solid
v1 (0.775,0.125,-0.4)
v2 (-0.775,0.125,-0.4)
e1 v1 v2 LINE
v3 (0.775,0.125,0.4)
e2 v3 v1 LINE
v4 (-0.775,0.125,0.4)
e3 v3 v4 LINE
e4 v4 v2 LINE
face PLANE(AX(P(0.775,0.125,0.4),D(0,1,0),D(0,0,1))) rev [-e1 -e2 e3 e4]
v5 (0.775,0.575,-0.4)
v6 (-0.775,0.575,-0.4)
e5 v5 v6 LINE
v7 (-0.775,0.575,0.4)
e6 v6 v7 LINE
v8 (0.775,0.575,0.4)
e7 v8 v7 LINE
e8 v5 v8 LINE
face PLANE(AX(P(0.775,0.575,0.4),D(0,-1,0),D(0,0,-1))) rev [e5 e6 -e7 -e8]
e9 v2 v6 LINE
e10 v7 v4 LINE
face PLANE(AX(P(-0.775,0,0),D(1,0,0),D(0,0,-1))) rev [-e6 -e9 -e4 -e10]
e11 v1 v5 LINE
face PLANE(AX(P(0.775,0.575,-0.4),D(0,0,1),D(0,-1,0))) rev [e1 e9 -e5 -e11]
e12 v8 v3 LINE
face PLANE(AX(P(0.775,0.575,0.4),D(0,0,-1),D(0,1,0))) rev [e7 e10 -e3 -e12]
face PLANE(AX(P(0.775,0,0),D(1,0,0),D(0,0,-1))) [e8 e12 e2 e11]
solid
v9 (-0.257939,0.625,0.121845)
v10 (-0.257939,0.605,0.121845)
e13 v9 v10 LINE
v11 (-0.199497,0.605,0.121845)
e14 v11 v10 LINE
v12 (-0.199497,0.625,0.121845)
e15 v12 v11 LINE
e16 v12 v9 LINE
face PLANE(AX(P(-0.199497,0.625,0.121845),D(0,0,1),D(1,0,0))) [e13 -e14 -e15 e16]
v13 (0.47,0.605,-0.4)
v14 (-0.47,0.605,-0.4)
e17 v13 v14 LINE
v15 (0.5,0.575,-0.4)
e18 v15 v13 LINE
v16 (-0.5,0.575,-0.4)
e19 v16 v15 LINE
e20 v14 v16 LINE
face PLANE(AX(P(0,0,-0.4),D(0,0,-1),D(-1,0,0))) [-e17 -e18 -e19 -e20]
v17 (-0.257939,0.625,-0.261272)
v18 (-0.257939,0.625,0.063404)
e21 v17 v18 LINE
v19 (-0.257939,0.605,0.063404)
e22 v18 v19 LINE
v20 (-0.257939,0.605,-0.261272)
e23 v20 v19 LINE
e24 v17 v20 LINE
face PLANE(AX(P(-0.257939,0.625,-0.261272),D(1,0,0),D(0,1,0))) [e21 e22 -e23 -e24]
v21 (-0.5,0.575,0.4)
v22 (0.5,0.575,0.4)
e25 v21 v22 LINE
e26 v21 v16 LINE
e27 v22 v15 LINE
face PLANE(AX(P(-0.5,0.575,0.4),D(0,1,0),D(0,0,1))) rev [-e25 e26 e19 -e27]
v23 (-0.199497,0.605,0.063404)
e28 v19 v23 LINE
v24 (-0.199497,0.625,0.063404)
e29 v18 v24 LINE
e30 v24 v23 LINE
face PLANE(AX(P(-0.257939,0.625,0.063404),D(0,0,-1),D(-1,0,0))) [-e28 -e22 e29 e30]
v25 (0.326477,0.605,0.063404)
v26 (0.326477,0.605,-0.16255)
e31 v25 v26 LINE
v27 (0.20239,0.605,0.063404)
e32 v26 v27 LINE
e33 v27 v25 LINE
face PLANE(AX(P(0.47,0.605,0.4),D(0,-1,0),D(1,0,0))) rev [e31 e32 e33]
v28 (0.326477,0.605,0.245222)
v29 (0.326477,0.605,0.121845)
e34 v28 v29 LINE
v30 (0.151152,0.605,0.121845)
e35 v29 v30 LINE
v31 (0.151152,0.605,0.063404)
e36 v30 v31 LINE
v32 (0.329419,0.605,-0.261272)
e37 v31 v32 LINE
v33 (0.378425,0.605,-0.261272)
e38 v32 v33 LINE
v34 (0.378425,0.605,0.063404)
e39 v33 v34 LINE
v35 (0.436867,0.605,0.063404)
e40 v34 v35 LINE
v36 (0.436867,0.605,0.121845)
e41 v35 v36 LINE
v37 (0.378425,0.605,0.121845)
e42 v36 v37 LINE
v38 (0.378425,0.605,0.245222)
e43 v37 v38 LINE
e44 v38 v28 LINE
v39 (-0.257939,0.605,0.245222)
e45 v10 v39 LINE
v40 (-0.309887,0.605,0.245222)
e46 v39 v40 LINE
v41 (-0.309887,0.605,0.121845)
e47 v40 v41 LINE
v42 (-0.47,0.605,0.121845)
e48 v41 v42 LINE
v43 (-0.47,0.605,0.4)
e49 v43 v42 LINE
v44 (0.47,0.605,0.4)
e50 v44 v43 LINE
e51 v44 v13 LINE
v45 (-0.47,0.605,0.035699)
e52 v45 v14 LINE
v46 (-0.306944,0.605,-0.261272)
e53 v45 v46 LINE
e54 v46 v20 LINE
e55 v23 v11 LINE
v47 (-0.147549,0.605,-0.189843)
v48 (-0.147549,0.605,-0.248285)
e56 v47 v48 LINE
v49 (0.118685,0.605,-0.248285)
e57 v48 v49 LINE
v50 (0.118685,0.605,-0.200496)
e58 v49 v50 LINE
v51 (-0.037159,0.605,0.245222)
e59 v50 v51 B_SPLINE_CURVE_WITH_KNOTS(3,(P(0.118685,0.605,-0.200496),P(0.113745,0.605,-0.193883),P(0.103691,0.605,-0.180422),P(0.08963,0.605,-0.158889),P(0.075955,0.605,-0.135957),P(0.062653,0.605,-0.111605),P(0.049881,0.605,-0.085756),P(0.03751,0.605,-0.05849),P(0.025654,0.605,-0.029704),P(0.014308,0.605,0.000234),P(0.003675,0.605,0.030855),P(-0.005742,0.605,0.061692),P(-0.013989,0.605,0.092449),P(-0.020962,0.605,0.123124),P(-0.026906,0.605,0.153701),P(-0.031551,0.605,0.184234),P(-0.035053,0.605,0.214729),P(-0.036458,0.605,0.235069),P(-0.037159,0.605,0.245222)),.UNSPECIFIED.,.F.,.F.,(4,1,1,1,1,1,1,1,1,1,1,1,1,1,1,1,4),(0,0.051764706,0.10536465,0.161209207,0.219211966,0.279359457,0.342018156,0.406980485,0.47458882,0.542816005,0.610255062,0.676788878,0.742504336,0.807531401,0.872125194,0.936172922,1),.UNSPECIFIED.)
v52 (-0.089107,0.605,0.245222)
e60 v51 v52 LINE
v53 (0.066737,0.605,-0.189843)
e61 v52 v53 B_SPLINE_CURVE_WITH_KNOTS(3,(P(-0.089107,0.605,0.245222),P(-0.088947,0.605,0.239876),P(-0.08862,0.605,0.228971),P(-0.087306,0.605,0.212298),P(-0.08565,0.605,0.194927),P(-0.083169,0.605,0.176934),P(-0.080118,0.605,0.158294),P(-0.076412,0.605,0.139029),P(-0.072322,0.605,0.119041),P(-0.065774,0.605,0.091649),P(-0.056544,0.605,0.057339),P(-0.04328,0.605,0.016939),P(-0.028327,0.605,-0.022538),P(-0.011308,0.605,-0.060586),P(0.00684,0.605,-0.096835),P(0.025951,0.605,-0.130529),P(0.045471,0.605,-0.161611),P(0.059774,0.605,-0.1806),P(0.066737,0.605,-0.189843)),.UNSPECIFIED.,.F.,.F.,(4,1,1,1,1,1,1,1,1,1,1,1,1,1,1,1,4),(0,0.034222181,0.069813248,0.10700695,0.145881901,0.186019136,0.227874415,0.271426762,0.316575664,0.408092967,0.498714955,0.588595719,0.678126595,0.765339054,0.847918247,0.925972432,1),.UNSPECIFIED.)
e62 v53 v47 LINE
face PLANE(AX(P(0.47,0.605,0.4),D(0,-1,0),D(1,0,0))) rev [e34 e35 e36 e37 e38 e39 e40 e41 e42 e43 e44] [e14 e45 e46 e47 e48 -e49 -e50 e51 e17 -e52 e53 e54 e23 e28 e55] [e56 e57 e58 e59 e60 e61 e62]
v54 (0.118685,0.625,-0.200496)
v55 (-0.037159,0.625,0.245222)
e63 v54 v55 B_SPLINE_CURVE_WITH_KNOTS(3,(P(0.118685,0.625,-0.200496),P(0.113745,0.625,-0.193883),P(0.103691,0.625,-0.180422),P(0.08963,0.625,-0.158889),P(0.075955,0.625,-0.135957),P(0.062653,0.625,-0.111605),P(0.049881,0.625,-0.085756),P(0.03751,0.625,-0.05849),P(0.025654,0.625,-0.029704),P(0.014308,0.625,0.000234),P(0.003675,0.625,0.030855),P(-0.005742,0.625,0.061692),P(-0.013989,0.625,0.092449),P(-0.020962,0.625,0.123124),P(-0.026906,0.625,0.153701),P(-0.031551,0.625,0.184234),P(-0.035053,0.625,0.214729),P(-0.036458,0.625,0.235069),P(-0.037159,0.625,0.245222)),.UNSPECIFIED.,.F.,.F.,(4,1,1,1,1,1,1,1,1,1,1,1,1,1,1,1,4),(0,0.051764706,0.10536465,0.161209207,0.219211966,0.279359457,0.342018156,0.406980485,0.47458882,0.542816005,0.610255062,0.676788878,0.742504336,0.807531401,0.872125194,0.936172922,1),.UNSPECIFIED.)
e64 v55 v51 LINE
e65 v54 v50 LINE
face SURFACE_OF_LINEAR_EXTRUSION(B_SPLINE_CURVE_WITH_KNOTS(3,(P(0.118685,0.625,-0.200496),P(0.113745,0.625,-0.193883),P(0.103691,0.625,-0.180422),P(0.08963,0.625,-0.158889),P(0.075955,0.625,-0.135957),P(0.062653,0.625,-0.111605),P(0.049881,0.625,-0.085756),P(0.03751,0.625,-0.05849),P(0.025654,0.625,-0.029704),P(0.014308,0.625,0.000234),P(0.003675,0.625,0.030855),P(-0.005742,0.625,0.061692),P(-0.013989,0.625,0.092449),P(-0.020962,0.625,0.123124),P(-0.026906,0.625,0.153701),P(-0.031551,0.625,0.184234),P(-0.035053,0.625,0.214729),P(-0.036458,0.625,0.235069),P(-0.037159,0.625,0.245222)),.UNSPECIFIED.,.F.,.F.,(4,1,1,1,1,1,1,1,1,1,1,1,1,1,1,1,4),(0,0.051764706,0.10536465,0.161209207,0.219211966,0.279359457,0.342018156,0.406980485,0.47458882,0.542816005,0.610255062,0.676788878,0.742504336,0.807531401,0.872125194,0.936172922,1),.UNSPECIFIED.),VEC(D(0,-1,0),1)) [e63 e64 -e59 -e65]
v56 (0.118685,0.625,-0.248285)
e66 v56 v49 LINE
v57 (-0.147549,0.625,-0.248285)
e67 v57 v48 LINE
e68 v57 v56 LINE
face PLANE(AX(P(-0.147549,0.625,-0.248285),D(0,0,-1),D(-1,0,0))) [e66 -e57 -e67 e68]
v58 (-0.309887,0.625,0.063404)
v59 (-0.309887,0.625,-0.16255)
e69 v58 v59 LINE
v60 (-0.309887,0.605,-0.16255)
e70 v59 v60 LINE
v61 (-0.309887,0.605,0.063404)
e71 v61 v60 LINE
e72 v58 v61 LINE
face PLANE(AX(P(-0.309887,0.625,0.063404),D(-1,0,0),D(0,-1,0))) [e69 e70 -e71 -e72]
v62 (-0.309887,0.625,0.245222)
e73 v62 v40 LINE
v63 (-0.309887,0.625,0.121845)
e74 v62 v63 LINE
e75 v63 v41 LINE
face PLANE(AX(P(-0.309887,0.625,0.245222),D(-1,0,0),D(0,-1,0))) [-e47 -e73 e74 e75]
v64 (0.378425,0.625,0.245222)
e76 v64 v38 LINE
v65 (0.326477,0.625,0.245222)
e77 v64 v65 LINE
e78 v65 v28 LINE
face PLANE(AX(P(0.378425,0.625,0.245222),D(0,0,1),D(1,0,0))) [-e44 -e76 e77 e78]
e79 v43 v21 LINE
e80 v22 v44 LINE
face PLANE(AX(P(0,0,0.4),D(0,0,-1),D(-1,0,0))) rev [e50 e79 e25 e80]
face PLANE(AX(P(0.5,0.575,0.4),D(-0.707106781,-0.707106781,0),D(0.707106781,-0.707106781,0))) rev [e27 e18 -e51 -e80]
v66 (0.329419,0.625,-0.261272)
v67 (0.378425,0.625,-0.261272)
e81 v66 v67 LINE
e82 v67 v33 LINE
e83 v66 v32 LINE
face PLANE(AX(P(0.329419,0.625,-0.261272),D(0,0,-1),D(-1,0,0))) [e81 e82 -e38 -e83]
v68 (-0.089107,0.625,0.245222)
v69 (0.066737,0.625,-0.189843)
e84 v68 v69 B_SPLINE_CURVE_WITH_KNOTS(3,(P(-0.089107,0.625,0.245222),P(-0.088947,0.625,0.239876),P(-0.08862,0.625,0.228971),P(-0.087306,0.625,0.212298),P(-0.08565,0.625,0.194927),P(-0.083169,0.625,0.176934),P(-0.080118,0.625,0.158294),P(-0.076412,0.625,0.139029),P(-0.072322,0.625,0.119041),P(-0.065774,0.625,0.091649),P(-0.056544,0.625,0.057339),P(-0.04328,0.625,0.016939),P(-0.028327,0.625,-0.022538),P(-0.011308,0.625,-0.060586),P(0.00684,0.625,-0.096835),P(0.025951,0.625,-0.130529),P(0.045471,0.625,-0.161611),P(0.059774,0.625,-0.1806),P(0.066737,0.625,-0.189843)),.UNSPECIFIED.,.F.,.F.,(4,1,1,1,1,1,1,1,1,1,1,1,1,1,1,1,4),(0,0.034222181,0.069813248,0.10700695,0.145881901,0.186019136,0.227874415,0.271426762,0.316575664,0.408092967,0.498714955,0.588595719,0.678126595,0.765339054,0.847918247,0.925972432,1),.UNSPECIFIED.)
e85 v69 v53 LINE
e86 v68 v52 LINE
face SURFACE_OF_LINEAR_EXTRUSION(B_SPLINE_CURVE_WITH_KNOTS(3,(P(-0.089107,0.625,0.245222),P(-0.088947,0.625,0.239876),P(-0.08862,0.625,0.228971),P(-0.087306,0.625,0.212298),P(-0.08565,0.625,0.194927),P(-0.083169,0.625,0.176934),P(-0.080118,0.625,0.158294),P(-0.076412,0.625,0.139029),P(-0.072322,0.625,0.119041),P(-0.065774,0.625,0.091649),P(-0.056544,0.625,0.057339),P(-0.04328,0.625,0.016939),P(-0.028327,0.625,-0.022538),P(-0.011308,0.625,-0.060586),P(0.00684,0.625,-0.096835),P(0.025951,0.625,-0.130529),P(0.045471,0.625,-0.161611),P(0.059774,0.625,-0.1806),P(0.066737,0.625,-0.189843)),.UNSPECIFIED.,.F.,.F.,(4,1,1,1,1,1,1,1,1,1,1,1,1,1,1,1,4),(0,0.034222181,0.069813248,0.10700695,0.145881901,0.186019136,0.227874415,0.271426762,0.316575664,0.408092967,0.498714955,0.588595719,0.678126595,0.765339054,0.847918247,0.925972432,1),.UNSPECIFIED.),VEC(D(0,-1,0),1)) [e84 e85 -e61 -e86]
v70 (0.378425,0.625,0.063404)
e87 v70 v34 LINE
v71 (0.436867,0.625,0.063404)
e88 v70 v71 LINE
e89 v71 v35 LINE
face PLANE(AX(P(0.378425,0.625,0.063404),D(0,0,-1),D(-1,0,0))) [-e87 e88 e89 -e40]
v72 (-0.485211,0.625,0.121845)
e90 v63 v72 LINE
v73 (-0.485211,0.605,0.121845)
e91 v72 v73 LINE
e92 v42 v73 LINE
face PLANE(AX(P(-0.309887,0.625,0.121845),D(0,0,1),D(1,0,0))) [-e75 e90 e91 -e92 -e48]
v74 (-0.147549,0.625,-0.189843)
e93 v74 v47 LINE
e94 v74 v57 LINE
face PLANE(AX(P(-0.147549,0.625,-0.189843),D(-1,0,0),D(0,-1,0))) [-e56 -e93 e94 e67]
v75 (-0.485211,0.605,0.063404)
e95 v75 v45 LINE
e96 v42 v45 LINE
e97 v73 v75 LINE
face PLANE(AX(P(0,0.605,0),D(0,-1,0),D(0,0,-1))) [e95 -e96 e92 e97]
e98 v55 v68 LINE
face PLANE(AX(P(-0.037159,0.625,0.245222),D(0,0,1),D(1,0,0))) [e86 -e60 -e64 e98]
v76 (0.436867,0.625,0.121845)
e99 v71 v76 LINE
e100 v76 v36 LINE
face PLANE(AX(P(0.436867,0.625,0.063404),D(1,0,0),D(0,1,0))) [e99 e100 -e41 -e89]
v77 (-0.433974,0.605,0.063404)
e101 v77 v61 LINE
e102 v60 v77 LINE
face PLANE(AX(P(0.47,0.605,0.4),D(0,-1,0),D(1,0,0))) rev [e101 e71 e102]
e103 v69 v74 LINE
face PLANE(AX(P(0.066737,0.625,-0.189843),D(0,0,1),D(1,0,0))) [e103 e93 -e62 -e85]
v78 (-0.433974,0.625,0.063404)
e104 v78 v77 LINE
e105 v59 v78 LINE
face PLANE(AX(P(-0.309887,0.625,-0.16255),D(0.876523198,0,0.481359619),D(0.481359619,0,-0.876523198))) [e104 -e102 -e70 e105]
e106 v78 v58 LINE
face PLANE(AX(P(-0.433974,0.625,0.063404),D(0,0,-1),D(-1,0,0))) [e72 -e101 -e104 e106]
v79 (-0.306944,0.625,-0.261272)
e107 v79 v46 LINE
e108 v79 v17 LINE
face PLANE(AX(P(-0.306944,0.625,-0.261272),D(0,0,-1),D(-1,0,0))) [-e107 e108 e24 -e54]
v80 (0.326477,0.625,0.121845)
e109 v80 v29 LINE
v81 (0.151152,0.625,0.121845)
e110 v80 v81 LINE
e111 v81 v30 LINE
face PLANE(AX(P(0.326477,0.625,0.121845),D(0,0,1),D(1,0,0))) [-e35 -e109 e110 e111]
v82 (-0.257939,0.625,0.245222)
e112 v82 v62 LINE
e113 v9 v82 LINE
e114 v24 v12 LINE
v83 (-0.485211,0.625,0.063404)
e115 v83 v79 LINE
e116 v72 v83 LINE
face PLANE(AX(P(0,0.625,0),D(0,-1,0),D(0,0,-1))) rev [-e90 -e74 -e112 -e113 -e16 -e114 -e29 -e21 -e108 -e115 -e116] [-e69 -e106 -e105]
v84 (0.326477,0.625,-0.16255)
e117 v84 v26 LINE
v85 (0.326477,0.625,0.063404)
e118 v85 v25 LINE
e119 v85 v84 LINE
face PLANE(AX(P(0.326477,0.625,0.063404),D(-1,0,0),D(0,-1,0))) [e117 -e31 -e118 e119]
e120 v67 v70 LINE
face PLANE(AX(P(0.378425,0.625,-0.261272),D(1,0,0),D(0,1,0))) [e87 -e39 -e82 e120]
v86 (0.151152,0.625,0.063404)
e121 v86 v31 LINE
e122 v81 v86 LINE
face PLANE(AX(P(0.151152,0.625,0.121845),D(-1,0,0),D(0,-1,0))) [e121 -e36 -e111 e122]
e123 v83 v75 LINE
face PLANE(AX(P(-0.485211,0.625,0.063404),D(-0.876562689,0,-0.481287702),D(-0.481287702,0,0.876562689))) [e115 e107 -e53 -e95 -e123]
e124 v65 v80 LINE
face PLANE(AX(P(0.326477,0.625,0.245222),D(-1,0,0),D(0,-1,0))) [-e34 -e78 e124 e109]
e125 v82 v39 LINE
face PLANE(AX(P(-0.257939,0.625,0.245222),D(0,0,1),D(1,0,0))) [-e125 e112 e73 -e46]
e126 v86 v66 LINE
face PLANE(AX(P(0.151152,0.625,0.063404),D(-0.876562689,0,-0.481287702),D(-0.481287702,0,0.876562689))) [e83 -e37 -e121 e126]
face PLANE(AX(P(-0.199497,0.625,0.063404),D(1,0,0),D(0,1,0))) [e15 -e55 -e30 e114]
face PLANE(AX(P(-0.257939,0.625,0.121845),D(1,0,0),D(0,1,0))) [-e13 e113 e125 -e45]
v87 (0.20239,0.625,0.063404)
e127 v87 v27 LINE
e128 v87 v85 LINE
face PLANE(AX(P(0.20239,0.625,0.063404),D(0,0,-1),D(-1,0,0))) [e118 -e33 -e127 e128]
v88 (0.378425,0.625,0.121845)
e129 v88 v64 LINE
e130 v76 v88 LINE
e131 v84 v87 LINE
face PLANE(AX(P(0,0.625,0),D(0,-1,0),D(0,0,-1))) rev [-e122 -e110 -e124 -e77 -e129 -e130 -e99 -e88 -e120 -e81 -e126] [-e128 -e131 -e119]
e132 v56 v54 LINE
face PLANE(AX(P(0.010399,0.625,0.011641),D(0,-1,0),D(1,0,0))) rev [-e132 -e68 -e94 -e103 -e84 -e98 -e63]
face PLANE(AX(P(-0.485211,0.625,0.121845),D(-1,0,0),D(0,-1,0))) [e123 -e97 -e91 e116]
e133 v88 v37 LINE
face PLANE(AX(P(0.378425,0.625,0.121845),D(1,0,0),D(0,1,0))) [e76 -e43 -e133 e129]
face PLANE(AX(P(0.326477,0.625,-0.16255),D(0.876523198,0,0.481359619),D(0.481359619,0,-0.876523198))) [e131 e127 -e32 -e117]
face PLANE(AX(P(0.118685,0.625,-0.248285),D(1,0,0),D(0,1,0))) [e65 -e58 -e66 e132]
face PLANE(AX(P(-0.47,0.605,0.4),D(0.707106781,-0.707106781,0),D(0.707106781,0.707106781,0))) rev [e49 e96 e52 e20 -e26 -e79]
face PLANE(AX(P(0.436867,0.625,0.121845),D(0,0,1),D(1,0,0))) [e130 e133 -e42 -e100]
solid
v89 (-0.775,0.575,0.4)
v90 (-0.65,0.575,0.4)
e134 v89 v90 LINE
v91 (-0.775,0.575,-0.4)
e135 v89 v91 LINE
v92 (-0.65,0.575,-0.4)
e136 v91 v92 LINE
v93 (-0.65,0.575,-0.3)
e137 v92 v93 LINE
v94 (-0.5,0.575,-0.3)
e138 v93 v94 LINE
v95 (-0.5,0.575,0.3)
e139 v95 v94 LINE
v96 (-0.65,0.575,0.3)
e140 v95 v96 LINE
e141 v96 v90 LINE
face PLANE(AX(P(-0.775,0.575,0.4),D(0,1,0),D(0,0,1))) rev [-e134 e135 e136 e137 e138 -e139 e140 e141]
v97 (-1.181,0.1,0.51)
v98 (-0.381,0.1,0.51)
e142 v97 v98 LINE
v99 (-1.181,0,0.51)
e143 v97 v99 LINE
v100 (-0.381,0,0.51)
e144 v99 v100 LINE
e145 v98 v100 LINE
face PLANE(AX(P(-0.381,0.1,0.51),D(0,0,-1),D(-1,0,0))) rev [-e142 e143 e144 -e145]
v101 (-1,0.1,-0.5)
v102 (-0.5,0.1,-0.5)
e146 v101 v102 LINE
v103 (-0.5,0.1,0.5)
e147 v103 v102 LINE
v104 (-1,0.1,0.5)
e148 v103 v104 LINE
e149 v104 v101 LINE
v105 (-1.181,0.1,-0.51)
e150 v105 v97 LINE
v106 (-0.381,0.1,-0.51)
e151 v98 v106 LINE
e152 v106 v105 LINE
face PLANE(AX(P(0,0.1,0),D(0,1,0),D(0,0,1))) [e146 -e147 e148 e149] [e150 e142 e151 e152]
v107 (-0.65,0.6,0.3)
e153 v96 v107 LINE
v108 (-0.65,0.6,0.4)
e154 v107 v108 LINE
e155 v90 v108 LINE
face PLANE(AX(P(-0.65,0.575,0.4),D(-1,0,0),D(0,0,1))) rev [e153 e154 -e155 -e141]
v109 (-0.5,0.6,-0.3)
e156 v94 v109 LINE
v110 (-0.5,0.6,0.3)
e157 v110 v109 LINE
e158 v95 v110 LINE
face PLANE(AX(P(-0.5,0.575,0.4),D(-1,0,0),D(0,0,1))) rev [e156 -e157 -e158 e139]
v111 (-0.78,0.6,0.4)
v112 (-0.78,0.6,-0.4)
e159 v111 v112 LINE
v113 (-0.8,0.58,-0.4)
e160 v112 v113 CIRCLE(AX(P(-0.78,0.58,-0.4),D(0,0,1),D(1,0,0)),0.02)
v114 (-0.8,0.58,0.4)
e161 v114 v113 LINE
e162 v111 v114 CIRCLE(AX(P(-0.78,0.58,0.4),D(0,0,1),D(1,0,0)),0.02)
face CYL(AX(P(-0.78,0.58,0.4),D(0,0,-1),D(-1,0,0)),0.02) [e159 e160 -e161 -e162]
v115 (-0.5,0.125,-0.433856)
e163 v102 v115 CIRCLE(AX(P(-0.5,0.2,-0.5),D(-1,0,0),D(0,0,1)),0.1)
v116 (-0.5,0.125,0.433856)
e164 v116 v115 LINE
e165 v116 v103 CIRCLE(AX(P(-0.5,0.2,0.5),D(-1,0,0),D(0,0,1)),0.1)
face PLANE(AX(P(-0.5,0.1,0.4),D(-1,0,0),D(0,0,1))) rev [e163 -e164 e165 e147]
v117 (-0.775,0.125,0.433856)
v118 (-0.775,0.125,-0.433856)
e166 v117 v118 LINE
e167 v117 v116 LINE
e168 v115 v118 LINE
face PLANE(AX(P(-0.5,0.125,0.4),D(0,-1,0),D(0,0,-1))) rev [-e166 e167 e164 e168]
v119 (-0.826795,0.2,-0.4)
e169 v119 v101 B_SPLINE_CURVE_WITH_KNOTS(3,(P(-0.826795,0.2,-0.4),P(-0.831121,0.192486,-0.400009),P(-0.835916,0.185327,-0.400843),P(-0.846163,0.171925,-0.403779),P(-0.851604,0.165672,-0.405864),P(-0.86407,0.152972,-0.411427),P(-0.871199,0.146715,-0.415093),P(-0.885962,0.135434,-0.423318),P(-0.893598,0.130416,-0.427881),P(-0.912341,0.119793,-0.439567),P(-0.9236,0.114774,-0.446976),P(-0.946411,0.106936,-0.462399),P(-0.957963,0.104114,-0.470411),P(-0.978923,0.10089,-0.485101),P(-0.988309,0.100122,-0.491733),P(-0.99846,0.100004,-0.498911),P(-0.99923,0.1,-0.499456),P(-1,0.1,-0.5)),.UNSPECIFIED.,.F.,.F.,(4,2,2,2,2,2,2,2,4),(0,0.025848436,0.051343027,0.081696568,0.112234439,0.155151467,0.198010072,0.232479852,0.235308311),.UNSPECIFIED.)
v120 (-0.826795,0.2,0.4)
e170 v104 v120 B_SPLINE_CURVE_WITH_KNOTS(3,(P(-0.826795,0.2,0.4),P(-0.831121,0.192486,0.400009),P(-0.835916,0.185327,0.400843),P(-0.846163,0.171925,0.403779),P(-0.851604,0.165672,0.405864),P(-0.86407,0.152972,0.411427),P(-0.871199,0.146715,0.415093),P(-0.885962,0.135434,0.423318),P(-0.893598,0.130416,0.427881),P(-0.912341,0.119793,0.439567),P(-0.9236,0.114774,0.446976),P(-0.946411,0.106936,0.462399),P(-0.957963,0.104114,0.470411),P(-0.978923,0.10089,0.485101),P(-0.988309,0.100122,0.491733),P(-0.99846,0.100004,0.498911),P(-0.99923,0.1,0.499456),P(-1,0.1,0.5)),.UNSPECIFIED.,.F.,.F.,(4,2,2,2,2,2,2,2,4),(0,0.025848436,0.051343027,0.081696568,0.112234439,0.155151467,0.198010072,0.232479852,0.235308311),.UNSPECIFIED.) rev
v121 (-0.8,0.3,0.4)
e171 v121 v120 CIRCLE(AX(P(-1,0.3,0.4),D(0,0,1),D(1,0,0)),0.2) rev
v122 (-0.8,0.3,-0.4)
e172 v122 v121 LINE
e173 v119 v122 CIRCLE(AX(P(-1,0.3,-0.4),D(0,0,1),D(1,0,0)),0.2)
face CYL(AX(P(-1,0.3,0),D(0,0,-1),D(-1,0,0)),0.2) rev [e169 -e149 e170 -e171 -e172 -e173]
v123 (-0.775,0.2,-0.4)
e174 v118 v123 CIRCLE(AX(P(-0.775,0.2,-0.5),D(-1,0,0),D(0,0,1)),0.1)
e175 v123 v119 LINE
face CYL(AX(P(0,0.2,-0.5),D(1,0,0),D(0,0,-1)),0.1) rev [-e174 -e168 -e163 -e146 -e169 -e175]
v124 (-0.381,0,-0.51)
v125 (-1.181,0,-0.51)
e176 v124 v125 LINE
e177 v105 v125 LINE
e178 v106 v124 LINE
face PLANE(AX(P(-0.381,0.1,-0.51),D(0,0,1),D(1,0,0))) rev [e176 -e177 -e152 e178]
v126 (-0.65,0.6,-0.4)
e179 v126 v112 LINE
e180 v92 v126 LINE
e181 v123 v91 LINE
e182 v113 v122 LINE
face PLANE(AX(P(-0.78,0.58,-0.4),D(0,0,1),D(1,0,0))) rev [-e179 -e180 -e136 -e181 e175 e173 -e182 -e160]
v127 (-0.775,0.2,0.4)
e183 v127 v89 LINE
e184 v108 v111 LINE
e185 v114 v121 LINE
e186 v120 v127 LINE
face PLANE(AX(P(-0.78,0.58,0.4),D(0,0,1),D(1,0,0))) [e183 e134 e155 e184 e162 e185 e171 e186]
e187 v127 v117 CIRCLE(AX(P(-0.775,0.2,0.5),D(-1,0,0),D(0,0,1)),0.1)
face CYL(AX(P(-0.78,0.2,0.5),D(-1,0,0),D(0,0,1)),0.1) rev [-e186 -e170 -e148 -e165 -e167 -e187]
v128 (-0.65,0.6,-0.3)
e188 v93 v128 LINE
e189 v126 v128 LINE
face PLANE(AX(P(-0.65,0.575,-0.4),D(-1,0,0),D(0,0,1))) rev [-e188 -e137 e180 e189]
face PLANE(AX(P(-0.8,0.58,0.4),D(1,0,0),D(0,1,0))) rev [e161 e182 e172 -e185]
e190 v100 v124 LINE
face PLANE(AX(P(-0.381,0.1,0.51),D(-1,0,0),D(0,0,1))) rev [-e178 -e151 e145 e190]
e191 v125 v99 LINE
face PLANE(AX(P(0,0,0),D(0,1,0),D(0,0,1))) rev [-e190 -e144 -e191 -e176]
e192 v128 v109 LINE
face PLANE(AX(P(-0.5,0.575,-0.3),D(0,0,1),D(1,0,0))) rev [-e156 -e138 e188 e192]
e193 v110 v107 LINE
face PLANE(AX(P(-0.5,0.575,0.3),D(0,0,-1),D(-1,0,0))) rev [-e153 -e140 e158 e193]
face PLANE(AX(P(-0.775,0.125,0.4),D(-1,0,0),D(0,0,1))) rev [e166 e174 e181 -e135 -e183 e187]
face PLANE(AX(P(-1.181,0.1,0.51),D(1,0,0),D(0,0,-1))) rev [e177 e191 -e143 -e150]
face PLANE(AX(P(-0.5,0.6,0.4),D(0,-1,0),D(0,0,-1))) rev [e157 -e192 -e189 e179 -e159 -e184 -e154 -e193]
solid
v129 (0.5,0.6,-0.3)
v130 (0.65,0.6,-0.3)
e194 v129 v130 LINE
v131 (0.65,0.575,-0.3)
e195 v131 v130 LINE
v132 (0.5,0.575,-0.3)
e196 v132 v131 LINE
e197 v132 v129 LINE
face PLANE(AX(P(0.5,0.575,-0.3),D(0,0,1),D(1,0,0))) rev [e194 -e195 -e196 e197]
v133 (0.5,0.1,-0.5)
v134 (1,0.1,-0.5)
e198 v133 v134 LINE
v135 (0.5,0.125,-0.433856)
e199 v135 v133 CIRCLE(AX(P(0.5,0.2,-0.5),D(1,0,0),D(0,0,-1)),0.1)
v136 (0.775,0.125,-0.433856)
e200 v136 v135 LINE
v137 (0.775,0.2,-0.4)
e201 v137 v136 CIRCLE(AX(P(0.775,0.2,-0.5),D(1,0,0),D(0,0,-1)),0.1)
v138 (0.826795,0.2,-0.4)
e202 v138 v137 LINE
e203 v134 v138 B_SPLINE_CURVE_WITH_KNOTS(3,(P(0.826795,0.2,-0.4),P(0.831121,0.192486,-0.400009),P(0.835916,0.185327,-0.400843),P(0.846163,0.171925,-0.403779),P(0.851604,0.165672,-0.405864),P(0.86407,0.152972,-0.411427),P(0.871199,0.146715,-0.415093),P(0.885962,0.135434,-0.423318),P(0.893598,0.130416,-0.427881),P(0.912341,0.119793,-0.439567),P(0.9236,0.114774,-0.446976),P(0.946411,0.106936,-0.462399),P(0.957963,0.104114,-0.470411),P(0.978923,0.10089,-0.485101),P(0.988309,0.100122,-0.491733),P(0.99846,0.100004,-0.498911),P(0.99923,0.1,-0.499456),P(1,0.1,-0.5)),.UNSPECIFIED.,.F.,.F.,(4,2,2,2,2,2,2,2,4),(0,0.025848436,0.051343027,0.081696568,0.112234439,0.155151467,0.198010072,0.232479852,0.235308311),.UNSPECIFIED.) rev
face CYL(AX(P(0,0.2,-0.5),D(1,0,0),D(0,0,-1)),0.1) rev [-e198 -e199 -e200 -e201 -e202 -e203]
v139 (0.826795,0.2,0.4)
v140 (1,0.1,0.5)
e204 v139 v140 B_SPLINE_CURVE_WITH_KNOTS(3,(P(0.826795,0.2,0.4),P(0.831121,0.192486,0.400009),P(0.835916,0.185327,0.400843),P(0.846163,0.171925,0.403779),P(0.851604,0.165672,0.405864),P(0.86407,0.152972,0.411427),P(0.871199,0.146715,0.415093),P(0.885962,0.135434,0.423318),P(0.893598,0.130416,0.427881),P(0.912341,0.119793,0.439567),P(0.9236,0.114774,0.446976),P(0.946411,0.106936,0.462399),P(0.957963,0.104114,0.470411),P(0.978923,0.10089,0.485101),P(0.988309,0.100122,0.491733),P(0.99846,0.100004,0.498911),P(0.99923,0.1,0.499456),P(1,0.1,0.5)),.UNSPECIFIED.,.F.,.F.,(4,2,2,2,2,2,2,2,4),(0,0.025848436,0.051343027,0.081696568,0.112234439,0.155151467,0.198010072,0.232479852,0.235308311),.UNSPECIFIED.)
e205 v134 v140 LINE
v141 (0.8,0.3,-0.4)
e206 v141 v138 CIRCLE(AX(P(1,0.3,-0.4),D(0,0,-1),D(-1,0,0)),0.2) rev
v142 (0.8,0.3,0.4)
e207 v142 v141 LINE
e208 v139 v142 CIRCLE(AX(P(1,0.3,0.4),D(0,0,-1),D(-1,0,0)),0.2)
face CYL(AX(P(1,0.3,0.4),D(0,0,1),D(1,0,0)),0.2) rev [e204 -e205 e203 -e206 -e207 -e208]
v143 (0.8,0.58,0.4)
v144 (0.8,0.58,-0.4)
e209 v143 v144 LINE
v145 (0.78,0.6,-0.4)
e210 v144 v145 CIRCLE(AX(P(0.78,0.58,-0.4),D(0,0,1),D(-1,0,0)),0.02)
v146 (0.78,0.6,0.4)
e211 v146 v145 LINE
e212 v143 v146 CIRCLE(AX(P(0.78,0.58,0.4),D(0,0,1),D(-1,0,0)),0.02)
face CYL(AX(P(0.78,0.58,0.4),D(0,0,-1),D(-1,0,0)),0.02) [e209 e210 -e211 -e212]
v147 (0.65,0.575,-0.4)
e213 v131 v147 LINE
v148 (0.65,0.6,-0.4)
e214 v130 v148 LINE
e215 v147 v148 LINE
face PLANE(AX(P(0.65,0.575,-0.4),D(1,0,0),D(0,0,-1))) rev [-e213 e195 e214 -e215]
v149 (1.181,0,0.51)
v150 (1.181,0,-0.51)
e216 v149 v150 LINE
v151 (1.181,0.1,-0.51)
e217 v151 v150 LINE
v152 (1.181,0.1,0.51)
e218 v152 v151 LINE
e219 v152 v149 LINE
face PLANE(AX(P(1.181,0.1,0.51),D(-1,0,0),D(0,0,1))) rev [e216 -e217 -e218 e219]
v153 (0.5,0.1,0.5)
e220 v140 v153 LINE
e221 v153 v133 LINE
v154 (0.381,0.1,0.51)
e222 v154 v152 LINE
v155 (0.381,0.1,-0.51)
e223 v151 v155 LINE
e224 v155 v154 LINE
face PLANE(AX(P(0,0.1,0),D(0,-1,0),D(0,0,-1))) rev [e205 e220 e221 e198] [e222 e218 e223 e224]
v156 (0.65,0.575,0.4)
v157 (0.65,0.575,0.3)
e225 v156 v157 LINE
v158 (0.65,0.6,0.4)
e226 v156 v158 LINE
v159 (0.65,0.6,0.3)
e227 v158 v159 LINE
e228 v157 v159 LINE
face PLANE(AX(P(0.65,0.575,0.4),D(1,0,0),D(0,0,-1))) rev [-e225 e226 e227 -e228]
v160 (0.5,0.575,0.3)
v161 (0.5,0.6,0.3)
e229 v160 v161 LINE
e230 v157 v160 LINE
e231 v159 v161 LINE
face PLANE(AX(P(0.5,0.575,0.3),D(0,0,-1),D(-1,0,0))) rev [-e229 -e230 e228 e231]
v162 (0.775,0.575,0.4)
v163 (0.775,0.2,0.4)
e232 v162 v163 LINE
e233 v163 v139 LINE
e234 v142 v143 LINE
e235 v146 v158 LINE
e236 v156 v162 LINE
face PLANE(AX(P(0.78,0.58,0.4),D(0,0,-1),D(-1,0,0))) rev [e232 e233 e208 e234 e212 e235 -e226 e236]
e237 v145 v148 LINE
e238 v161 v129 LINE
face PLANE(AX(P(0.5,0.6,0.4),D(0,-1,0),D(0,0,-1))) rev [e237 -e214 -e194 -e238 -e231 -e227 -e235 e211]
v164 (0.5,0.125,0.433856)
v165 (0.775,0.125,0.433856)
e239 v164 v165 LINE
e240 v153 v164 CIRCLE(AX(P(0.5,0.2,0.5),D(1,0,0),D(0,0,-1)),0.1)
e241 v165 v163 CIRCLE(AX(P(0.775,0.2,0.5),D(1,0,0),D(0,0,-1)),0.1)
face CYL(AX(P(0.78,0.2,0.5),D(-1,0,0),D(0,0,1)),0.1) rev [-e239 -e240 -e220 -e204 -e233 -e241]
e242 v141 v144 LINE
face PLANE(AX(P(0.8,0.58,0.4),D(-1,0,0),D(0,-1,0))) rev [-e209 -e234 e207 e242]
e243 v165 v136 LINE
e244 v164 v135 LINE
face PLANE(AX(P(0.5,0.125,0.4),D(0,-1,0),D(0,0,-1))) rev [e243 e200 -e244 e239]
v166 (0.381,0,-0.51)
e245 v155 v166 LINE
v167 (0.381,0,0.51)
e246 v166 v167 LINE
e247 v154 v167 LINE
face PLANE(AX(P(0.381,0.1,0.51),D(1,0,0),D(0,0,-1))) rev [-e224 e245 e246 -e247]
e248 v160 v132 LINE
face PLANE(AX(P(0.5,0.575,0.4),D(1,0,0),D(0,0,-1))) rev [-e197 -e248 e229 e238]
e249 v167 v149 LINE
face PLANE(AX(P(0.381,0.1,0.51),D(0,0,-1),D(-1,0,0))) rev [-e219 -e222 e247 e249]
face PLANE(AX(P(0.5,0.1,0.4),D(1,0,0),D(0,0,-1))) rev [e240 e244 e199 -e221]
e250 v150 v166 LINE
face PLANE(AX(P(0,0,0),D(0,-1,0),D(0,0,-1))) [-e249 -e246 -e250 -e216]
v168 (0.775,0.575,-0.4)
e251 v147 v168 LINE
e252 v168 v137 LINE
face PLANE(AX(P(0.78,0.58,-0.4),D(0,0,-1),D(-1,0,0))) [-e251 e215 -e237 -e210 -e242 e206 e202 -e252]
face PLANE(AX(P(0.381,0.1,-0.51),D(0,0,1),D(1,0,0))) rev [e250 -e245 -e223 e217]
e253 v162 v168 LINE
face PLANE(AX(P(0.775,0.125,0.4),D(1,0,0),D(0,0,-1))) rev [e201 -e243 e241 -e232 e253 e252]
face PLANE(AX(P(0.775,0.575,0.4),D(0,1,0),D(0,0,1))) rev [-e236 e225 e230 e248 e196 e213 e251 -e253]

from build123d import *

# Parameters (mm, degrees)
SKETCH1_W             = 0.8
SKETCH1_H             = 0.45
BOSS_EXTRUDE1_DEPTH   = 0.775
BOSS_EXTRUDE2_DEPTH   = 0.4
BOSS_EXTRUDE2_2_DEPTH = 0.4
SKETCH3_W             = 0.15
SKETCH3_H             = 0.1
CUT_EXTRUDE1_DEPTH    = 0.025
BOSS_EXTRUDE3_DEPTH   = 0.4
SKETCH7_W             = 0.8
SKETCH7_H             = 1.02
BOSS_EXTRUDE5_DEPTH   = 0.1
FILLET3_R             = 0.2
FILLET4_R             = 0.2
FILLET5_R             = 0.1
FILLET6_R             = 0.1
BOSS_EXTRU_1_DEPTH    = 0.02


with BuildPart() as part:
    # Sketch1 → Boss-Extrude1 (new, symmetric)
    with BuildSketch(Plane(origin=(0, 0, 0), x_dir=(0, 0, -1), z_dir=(1, 0, 0))):
        with Locations((0, 0.35)):
            Rectangle(SKETCH1_W, SKETCH1_H)
    extrude(amount=BOSS_EXTRUDE1_DEPTH, both=True)


with BuildPart() as body_2:
    # Sketch2 → Boss-Extrude2 (new, symmetric)
    with BuildSketch(Plane.XY):
        with BuildLine():
            Line((-0.5, 0.6), (-0.78, 0.6))
            ThreePointArc((-0.78, 0.6), (-0.794142136, 0.594142136), (-0.8, 0.58))
            Line((-0.8, 0.58), (-0.8, 0.1))
            Line((-0.8, 0.1), (-0.5, 0.1))
            Line((-0.5, 0.1), (-0.5, 0.125))
            Line((-0.5, 0.125), (-0.775, 0.125))
            Line((-0.775, 0.125), (-0.775, 0.575))
            Line((-0.775, 0.575), (-0.5, 0.575))
            Line((-0.5, 0.575), (-0.5, 0.6))
        make_face()
    extrude(amount=BOSS_EXTRUDE2_DEPTH, both=True)


with BuildPart() as body_3:
    # Sketch2 → Boss-Extrude2 2 (new, symmetric)
    with BuildSketch(Plane.XY):
        with BuildLine():
            Line((0.5, 0.575), (0.5, 0.6))
            Line((0.5, 0.6), (0.78, 0.6))
            ThreePointArc((0.78, 0.6), (0.794142136, 0.594142136), (0.8, 0.58))
            Line((0.8, 0.58), (0.8, 0.1))
            Line((0.8, 0.1), (0.5, 0.1))
            Line((0.5, 0.1), (0.5, 0.125))
            Line((0.5, 0.125), (0.775, 0.125))
            Line((0.775, 0.125), (0.775, 0.575))
            Line((0.775, 0.575), (0.5, 0.575))
        make_face()
    extrude(amount=BOSS_EXTRUDE2_2_DEPTH, both=True)


with BuildPart() as cut_extrude1_tool:
    # Sketch3 → Cut-Extrude1 (new body)
    with BuildSketch(Plane(origin=(0, 0.6, 0), x_dir=(1, 0, 0), z_dir=(0, 1, 0))):
        with Locations((-0.575, 0.35)):
            Rectangle(SKETCH3_W, SKETCH3_H)
        with Locations((-0.575, -0.35)):
            Rectangle(SKETCH3_W, SKETCH3_H)
        with Locations((0.575, -0.35)):
            Rectangle(SKETCH3_W, SKETCH3_H)
        with Locations((0.575, 0.35)):
            Rectangle(SKETCH3_W, SKETCH3_H)
    extrude(amount=-CUT_EXTRUDE1_DEPTH)


with BuildPart() as body_2_1:
    add(body_2.part)

    # Cut-Extrude1: cut by cut_extrude1_tool
    add(cut_extrude1_tool.part, mode=Mode.SUBTRACT)



with BuildPart() as body_3_1:
    add(body_3.part)

    # Cut-Extrude1: cut by cut_extrude1_tool
    add(cut_extrude1_tool.part, mode=Mode.SUBTRACT)


with BuildPart() as body_4:
    # Sketch4 → Boss-Extrude3 (new, symmetric)
    with BuildSketch(Plane.XY):
        Polygon((-0.5, 0.575), (0.5, 0.575), (0.47, 0.605), (-0.47, 0.605), align=None)
    extrude(amount=BOSS_EXTRUDE3_DEPTH, both=True)

    # Esquisse2 → Boss.-Extru.1 (add)
    # profile 1 of 3: a face of its own
    with BuildSketch(Plane(origin=(0, 0.605, 0), x_dir=(1, 0, 0), z_dir=(0, 1, 0))):
        Polygon((-0.309886691, -0.245221888), (-0.309886691, -0.121845264), (-0.485211367, -0.121845264), (-0.485211367, -0.063403706), (-0.306944321, 0.261271619), (-0.257938639, 0.261271619), (-0.257938639, -0.063403706), (-0.199497081, -0.063403706), (-0.199497081, -0.121845264), (-0.257938639, -0.121845264), (-0.257938639, -0.245221888), align=None)
        Polygon((-0.309886691, -0.063403706), (-0.309886691, 0.162550028), (-0.433973542, -0.063403706), align=None, mode=Mode.SUBTRACT)
    # profile 2 of 3: a face of its own
    with BuildSketch(Plane(origin=(0, 0.605, 0), x_dir=(1, 0, 0), z_dir=(0, 1, 0))):
        with BuildLine():
            Line((-0.147549029, 0.189843048), (-0.147549029, 0.248284606))
            Line((-0.147549029, 0.248284606), (0.118684737, 0.248284606))
            Line((0.118684737, 0.248284606), (0.118684737, 0.200496457))
            add(Edge.make_bspline(
                [(0.118684737, 0.200496457), (0.11374506, 0.193883112), (0.103690577, 0.180421956), (0.089629665, 0.15888939), (0.075954824, 0.135956865), (0.062653235, 0.111604996), (0.049881166, 0.085755524), (0.037509723, 0.058489528), (0.02565439, 0.029704454), (0.014307924, -0.000233926), (0.003675417, -0.030854621), (-0.005742033, -0.061692329), (-0.013988634, -0.092449334), (-0.020962495, -0.123124227), (-0.026905964, -0.153701204), (-0.031550699, -0.184233606), (-0.035053075, -0.21472856), (-0.036458112, -0.235069144), (-0.037159418, -0.245221888)],
                knots=[0, 0, 0, 0, 0.828235292, 1.685834407, 2.579347319, 3.50739146, 4.469751317, 5.472290501, 6.511687755, 7.593421113, 8.685056077, 9.764080991, 10.828622054, 11.880069368, 12.920502423, 13.954003105, 14.978766756, 16, 16, 16, 16], degree=3))
            Line((-0.037159418, -0.245221888), (-0.08910747, -0.245221888))
            add(Edge.make_bspline(
                [(-0.08910747, -0.245221888), (-0.088946966, -0.239876054), (-0.088619538, -0.228970553), (-0.087305949, -0.2122975), (-0.085650055, -0.194926574), (-0.083168557, -0.176934464), (-0.080118357, -0.158294079), (-0.076411626, -0.13902896), (-0.072322113, -0.11904052), (-0.065773685, -0.091649168), (-0.056543919, -0.057339348), (-0.043279746, -0.016938754), (-0.028326509, 0.022538381), (-0.011308019, 0.060586243), (0.006839864, 0.096834643), (0.025951357, 0.13052881), (0.045471344, 0.161610603), (0.059774471, 0.180599823), (0.066736685, 0.189843048)],
                knots=[0, 0, 0, 0, 0.54755489, 1.117011975, 1.712111195, 2.334110413, 2.976306168, 3.645990646, 4.342828197, 5.06521062, 6.529487471, 7.979439287, 9.417531512, 10.850025522, 12.245424871, 13.566691952, 14.815558909, 16, 16, 16, 16], degree=3))
            Line((0.066736685, 0.189843048), (-0.147549029, 0.189843048))
        make_face()
    # profile 3 of 3: a face of its own
    with BuildSketch(Plane(origin=(0, 0.605, 0), x_dir=(1, 0, 0), z_dir=(0, 1, 0))):
        Polygon((0.326476945, -0.245221888), (0.326476945, -0.121845264), (0.15115227, -0.121845264), (0.15115227, -0.063403706), (0.329419315, 0.261271619), (0.378424997, 0.261271619), (0.378424997, -0.063403706), (0.436866556, -0.063403706), (0.436866556, -0.121845264), (0.378424997, -0.121845264), (0.378424997, -0.245221888), align=None)
        Polygon((0.326476945, -0.063403706), (0.326476945, 0.162550028), (0.202390094, -0.063403706), align=None, mode=Mode.SUBTRACT)
    extrude(amount=BOSS_EXTRU_1_DEPTH)


with BuildPart() as body_2_2:
    add(body_2_1.part)

    add(body_3_1.part)  # Boss-Extrude5 merges body 3
    # Sketch7 → Boss-Extrude5 (add)
    with BuildSketch(Plane(origin=(0, 0, 0), x_dir=(1, 0, 0), z_dir=(0, 1, 0))):
        with Locations((-0.781, 0)):
            Rectangle(SKETCH7_W, SKETCH7_H)
        with Locations((0.781, 0)):
            Rectangle(SKETCH7_W, SKETCH7_H)
    extrude(amount=BOSS_EXTRUDE5_DEPTH)

    # Fillet3
    fillet3_edges = [body_2_2.edges().sort_by_distance(p)[0] for p in [
        (-0.8, 0.1, 0),
    ]]
    fillet(fillet3_edges, radius=FILLET3_R)

    # Fillet4
    fillet4_edges = [body_2_2.edges().sort_by_distance(p)[0] for p in [
        (0.8, 0.1, 0),
    ]]
    fillet(fillet4_edges, radius=FILLET4_R)

    # Fillet5
    fillet5_edges = [body_2_2.edges().sort_by_distance(p)[0] for p in [
        (0.75, 0.1, 0.4),
    ]]
    fillet(fillet5_edges, radius=FILLET5_R)
    fillet5_2_edges = [body_2_2.edges().sort_by_distance(p)[0] for p in [
        (0.75, 0.1, -0.4),
    ]]
    fillet(fillet5_2_edges, radius=FILLET5_R)

    # Fillet6
    fillet6_edges = [body_2_2.edges().sort_by_distance(p)[0] for p in [
        (-0.75, 0.1, -0.4),
    ]]
    fillet(fillet6_edges, radius=FILLET6_R)
    fillet6_2_edges = [body_2_2.edges().sort_by_distance(p)[0] for p in [
        (-0.75, 0.1, 0.4),
    ]]
    fillet(fillet6_2_edges, radius=FILLET6_R)


solid = Compound([part.part, body_4.part, body_2_2.part])
